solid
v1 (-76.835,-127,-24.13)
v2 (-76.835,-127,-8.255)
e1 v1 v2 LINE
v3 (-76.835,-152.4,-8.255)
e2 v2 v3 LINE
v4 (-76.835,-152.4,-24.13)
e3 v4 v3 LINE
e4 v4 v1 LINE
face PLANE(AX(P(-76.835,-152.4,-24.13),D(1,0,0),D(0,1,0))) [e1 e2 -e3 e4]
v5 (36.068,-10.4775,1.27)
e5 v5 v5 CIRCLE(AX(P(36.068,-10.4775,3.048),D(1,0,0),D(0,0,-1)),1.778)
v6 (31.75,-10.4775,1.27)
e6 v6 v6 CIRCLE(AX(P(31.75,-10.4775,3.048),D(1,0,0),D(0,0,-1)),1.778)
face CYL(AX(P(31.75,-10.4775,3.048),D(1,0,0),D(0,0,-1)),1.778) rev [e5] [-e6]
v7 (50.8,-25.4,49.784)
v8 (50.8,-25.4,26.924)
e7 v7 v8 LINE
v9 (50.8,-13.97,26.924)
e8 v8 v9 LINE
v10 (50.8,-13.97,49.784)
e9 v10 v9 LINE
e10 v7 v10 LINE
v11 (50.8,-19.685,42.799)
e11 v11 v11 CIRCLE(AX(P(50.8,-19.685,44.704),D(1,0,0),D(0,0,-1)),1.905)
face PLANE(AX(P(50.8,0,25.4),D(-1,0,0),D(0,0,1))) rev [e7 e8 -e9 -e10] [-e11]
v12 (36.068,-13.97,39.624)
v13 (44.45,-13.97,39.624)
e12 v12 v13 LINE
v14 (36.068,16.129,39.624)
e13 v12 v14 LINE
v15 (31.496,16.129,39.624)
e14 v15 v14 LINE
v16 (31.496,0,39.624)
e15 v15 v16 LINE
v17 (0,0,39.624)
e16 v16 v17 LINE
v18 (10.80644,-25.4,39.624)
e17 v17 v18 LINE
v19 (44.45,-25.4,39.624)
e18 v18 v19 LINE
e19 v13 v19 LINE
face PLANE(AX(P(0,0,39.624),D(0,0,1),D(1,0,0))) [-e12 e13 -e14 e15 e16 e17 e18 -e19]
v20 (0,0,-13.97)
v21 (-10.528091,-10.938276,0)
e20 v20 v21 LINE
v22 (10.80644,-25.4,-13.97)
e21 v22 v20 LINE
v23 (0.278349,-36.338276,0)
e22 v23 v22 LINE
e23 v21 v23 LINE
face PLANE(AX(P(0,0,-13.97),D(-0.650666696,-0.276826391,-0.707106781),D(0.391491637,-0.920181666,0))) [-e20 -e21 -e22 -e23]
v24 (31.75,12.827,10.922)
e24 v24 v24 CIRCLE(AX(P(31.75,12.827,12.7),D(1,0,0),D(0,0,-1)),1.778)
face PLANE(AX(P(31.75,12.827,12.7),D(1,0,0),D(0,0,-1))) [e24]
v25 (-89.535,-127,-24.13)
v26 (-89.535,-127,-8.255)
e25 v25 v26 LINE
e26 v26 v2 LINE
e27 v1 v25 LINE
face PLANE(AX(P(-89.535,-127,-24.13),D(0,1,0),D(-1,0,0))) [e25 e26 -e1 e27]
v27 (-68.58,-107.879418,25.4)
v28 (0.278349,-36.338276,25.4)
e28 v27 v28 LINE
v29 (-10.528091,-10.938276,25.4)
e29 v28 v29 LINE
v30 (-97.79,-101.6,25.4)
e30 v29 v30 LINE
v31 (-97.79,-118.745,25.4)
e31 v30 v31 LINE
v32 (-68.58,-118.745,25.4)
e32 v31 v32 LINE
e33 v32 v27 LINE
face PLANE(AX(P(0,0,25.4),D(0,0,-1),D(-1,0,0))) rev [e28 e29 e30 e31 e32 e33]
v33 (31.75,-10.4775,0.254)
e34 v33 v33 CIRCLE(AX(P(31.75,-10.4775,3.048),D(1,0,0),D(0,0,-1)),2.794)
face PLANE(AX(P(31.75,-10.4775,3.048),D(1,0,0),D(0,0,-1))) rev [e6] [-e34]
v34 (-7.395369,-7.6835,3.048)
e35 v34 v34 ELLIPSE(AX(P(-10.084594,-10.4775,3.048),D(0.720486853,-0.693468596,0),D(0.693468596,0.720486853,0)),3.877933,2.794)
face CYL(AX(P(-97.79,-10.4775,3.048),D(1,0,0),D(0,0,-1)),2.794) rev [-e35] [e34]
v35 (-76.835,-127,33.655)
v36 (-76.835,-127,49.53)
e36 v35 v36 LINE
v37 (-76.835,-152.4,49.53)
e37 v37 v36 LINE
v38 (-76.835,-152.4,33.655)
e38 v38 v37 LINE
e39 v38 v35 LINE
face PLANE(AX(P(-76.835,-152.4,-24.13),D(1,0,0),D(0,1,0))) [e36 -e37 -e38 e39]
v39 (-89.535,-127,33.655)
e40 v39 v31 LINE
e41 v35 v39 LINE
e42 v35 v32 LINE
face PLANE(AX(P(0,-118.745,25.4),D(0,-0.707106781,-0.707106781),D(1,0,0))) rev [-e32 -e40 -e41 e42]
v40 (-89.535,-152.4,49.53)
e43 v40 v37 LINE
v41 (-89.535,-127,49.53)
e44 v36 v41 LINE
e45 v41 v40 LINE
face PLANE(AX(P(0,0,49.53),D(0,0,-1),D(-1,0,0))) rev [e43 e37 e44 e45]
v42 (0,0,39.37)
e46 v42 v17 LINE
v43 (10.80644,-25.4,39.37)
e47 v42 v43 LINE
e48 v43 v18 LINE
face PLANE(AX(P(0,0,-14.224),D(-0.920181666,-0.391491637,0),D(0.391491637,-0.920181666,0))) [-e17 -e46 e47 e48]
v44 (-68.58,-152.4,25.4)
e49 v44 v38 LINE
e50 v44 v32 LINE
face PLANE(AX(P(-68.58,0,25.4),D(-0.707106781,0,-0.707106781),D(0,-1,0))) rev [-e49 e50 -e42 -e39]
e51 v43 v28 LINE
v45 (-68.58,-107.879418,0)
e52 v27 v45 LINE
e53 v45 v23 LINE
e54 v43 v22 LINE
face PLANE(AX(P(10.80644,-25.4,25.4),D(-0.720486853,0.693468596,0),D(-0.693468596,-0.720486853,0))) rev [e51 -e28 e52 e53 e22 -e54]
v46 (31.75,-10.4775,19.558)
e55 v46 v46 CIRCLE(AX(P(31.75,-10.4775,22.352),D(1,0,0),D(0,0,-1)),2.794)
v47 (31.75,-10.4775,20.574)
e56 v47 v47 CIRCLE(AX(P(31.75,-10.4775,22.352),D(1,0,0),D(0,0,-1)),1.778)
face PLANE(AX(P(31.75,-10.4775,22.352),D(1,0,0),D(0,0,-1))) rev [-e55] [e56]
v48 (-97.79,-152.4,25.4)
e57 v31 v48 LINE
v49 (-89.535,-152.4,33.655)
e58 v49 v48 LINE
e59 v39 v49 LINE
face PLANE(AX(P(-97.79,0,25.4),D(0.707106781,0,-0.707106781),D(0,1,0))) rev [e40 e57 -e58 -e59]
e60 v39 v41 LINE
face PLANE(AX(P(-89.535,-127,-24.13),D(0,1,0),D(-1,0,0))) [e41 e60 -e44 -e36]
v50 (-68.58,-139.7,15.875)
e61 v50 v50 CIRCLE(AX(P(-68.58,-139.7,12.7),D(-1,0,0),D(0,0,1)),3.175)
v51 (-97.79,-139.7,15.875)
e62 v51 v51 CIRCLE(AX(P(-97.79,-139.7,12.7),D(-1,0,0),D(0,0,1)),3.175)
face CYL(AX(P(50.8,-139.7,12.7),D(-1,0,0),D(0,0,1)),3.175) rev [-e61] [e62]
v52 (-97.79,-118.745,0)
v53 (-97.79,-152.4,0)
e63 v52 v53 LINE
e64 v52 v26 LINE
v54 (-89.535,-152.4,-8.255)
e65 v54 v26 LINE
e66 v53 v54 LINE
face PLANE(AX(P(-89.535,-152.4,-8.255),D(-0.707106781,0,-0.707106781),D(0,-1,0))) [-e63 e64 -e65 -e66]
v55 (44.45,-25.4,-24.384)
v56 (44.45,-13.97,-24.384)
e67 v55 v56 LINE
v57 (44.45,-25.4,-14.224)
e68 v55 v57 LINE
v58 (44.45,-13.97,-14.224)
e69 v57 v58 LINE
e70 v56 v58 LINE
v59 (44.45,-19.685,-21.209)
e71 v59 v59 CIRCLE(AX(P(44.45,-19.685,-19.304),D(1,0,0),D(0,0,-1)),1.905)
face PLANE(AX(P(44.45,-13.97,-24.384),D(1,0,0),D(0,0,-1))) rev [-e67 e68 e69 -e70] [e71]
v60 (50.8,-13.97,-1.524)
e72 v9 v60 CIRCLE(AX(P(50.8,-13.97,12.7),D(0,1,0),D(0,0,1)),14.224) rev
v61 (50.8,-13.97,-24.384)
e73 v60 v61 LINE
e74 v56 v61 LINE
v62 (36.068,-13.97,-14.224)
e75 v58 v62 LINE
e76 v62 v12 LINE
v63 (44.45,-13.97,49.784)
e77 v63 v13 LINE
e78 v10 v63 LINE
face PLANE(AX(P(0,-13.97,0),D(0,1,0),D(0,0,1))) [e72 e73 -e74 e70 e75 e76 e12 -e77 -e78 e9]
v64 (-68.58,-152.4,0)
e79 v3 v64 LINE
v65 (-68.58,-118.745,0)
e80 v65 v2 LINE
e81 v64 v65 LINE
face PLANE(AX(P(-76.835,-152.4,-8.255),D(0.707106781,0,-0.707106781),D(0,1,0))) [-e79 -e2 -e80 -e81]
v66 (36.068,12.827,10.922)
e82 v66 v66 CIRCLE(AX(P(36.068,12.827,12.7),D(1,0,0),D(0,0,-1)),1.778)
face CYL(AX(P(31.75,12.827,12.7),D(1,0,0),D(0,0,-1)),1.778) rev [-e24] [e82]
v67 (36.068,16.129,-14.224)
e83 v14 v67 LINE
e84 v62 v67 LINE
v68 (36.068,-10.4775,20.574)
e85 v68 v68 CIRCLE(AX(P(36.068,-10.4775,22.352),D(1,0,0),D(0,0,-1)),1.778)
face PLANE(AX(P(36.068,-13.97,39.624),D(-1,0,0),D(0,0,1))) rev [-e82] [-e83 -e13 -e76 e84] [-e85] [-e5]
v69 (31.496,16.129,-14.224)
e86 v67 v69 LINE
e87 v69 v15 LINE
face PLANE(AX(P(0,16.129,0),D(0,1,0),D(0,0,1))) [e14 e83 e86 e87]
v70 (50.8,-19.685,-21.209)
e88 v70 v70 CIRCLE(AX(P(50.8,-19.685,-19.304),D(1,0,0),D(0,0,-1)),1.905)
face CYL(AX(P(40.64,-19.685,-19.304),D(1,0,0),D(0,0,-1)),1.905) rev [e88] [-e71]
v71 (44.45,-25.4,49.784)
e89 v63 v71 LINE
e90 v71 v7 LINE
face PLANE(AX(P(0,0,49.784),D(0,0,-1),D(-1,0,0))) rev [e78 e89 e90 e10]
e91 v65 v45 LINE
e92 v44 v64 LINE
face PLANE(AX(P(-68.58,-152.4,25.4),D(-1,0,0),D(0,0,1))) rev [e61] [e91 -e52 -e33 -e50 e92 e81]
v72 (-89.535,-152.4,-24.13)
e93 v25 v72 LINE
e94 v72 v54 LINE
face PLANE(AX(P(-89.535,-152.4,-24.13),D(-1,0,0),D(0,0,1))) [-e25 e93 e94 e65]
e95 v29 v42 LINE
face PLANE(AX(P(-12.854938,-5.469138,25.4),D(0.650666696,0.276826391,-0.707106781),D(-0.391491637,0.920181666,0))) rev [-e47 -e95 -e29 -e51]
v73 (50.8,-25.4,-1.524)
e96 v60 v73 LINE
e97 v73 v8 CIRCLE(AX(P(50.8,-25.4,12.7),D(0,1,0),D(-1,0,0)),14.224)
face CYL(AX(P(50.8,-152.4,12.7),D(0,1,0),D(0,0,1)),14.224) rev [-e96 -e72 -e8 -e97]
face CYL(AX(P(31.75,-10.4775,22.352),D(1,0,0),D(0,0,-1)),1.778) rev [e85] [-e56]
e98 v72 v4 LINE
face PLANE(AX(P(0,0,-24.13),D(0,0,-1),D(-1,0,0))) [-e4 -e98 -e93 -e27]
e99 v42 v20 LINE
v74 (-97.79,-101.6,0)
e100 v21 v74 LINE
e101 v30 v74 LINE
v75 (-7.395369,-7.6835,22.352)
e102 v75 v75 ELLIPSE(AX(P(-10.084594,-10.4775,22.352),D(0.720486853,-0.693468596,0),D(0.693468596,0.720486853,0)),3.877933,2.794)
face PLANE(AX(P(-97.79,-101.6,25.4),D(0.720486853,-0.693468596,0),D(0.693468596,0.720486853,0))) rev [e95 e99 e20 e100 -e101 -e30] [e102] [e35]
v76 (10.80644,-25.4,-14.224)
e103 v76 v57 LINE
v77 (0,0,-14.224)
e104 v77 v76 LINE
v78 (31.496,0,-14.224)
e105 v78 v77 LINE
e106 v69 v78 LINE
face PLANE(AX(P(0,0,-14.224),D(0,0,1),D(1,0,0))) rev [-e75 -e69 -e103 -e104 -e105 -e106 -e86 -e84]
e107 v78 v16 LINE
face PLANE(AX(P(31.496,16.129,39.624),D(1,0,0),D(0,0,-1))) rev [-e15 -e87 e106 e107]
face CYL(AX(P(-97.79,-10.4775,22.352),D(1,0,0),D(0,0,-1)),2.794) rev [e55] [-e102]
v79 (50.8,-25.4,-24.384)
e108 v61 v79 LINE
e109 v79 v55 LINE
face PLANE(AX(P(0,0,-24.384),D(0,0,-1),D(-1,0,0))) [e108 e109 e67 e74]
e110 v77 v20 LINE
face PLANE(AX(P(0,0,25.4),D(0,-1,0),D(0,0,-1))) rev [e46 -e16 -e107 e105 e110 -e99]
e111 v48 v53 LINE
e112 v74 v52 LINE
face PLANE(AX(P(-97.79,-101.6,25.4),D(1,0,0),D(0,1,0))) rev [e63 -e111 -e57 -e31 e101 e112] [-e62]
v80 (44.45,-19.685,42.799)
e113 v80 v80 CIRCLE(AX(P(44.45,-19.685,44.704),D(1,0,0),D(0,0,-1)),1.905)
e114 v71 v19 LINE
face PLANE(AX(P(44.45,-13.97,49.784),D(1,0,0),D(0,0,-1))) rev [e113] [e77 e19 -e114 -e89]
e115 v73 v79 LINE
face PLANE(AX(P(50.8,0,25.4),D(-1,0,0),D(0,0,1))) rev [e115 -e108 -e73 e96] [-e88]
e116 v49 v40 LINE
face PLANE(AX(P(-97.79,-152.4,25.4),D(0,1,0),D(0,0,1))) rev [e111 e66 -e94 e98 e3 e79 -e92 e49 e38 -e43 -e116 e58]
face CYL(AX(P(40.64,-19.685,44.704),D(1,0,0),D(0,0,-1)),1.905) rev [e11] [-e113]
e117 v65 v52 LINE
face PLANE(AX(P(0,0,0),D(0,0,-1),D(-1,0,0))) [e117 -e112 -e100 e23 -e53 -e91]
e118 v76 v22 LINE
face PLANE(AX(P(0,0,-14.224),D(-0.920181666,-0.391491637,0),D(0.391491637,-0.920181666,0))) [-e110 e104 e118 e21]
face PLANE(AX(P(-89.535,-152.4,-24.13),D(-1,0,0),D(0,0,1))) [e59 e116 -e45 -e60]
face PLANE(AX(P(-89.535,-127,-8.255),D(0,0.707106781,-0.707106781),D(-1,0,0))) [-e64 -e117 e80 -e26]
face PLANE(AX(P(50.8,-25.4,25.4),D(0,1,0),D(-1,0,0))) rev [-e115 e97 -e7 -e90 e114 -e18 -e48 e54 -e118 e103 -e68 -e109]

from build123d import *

# Parameters (mm, degrees)
BOSS_EXTRUDE1_DEPTH      = 25.4
BOSS_EXTRUDE4_DEPTH      = 24.13
BOSS_EXTRUDE4_DEPTH_BACK = 49.53
SKETCH7_W                = 12.7
SKETCH7_H                = 25.4
SKETCH8_R                = 3.175
CUT_EXTRUDE3_DEPTH       = 219.535967291
CHAMFER3_SIZE            = 8.255
BOSS_EXTRUDE5_DEPTH      = 14.224
BOSS_EXTRUDE5_DEPTH_BACK = 39.624
SKETCH9_R                = 14.224
CUT_EXTRUDE4_DEPTH       = 188.728167838
SKETCH11_W               = 14.732
SKETCH11_H               = 53.848
CUT_EXTRUDE5_DEPTH       = 13.97
CHAMFER5_SIZE            = 13.97
SKETCH18_W               = 6.35
SKETCH18_H               = 11.43
BOSS_EXTRUDE6_DEPTH      = 10.16
SKETCH19_W               = 6.35
SKETCH19_H               = 11.43
BOSS_EXTRUDE7_DEPTH      = 10.16
SKETCH20_R               = 1.905
CUT_EXTRUDE7_DEPTH       = 10.16
SKETCH21_W               = 4.572
SKETCH21_H               = 53.848
BOSS_EXTRUDE8_DEPTH      = 16.129
SKETCH22_R               = 1.778
CUT_EXTRUDE8_DEPTH       = 4.318
SKETCH23_R               = 2.794
CUT_EXTRUDE9_DEPTH       = 207.118456854


with BuildPart() as part:
    # Sketch2 → Boss-Extrude1 (new body)
    with BuildSketch(Plane.XY):
        Polygon((0, 0), (50.8, 0), (50.8, -25.4), (10.806439585, -25.4), (-68.58, -107.87941775), (-68.58, -152.4), (-97.79, -152.4), (-97.79, -101.6), align=None)
    extrude(amount=BOSS_EXTRUDE1_DEPTH)

    # Sketch7 → Boss-Extrude4 (add, two sides: drawn at the far end of the back side and taken through both)
    with BuildSketch(Plane.XY.offset(25.4).offset(-BOSS_EXTRUDE4_DEPTH_BACK)):
        with Locations((-83.185, -139.7)):
            Rectangle(SKETCH7_W, SKETCH7_H)
    extrude(amount=BOSS_EXTRUDE4_DEPTH + BOSS_EXTRUDE4_DEPTH_BACK)

    # Sketch8 → Cut-Extrude3 (cut, through all)
    with BuildSketch(Plane.ZY.offset(97.79)):
        with Locations((12.7, -139.7)):
            Circle(SKETCH8_R)
    extrude(amount=-CUT_EXTRUDE3_DEPTH, mode=Mode.SUBTRACT)

    # Chamfer3
    chamfer3_edges = [part.edges().sort_by_distance(p)[0] for p in [
        (-76.835, -139.7, 25.4),
        (-76.835, -139.7, 0),
        (-83.185, -127, 25.4),
        (-83.185, -127, 0),
        (-89.535, -139.7, 25.4),
        (-89.535, -139.7, 0),
    ]]
    chamfer(chamfer3_edges, length=CHAMFER3_SIZE - 0.0001)  # a hair under: the kernel refuses the full size

    # Sketch10 → Boss-Extrude5 (add, two sides: drawn at the far end of the back side and taken through both)
    with BuildSketch(Plane.XY.offset(25.4).offset(-BOSS_EXTRUDE5_DEPTH_BACK)):
        Polygon((0, 0), (10.806439585, -25.4), (50.8, -25.4), (50.8, 0), align=None)
    extrude(amount=BOSS_EXTRUDE5_DEPTH + BOSS_EXTRUDE5_DEPTH_BACK)

    # Sketch9 → Cut-Extrude4 (cut, through all)
    with BuildSketch(Plane(origin=(0, 0, 0), x_dir=(1, 0, 0), z_dir=(0, 1, 0))):
        with Locations((50.8, -12.7)):
            Circle(SKETCH9_R)
    extrude(amount=-CUT_EXTRUDE4_DEPTH, mode=Mode.SUBTRACT)

    # Sketch11 → Cut-Extrude5 (cut)
    with BuildSketch(Plane(origin=(0, 0, 0), x_dir=(1, 0, 0), z_dir=(0, 1, 0))):
        with Locations((43.434, -12.7)):
            Rectangle(SKETCH11_W, SKETCH11_H)
    extrude(amount=-CUT_EXTRUDE5_DEPTH, mode=Mode.SUBTRACT)

    # Chamfer5
    chamfer5_edges = [part.edges().sort_by_distance(p)[0] for p in [
        (5.403219792, -12.7, 0),
        (5.403219792, -12.7, 25.4),
    ]]
    chamfer(chamfer5_edges, length=CHAMFER5_SIZE)

    # Sketch18 → Boss-Extrude6 (add)
    with BuildSketch(Plane.XY.offset(39.624)):
        with Locations((47.625, -19.685)):
            Rectangle(SKETCH18_W, SKETCH18_H)
    extrude(amount=BOSS_EXTRUDE6_DEPTH)

    # Sketch19 → Boss-Extrude7 (add)
    with BuildSketch(Plane(origin=(0, 0, -14.224), x_dir=(-1, 0, 0), z_dir=(0, 0, -1))):
        with Locations((-47.625, -19.685)):
            Rectangle(SKETCH19_W, SKETCH19_H)
    extrude(amount=BOSS_EXTRUDE7_DEPTH)

    # Sketch20 → Cut-Extrude7 (cut)
    with BuildSketch(Plane(origin=(50.8, 0, 0), x_dir=(0, 0, -1), z_dir=(1, 0, 0))):
        with Locations((-44.704, -19.685)):
            Circle(SKETCH20_R)
        with Locations((19.304, -19.685)):
            Circle(SKETCH20_R)
    extrude(amount=-CUT_EXTRUDE7_DEPTH, mode=Mode.SUBTRACT)

    # Sketch21 → Boss-Extrude8 (add)
    with BuildSketch(Plane(origin=(0, 0, 0), x_dir=(1, 0, 0), z_dir=(0, 1, 0))):
        with Locations((33.782, -12.7)):
            Rectangle(SKETCH21_W, SKETCH21_H)
    extrude(amount=BOSS_EXTRUDE8_DEPTH)

    # Sketch22 → Cut-Extrude8 (cut)
    with BuildSketch(Plane(origin=(36.068, 0, 0), x_dir=(0, 0, -1), z_dir=(1, 0, 0))):
        with Locations((-12.7, 12.827)):
            Circle(SKETCH22_R)
        with Locations((-22.352, -10.4775)):
            Circle(SKETCH22_R)
        with Locations((-3.048, -10.4775)):
            Circle(SKETCH22_R)
    extrude(amount=-CUT_EXTRUDE8_DEPTH, mode=Mode.SUBTRACT)

    # Sketch23 → Cut-Extrude9 (cut, through all)
    with BuildSketch(Plane(origin=(31.75, 0, 0), x_dir=(0, 0, -1), z_dir=(1, 0, 0))):
        with Locations((-22.352, -10.4775)):
            Circle(SKETCH23_R)
        with Locations((-3.048, -10.4775)):
            Circle(SKETCH23_R)
    extrude(amount=-CUT_EXTRUDE9_DEPTH, mode=Mode.SUBTRACT)


solid = part.part
